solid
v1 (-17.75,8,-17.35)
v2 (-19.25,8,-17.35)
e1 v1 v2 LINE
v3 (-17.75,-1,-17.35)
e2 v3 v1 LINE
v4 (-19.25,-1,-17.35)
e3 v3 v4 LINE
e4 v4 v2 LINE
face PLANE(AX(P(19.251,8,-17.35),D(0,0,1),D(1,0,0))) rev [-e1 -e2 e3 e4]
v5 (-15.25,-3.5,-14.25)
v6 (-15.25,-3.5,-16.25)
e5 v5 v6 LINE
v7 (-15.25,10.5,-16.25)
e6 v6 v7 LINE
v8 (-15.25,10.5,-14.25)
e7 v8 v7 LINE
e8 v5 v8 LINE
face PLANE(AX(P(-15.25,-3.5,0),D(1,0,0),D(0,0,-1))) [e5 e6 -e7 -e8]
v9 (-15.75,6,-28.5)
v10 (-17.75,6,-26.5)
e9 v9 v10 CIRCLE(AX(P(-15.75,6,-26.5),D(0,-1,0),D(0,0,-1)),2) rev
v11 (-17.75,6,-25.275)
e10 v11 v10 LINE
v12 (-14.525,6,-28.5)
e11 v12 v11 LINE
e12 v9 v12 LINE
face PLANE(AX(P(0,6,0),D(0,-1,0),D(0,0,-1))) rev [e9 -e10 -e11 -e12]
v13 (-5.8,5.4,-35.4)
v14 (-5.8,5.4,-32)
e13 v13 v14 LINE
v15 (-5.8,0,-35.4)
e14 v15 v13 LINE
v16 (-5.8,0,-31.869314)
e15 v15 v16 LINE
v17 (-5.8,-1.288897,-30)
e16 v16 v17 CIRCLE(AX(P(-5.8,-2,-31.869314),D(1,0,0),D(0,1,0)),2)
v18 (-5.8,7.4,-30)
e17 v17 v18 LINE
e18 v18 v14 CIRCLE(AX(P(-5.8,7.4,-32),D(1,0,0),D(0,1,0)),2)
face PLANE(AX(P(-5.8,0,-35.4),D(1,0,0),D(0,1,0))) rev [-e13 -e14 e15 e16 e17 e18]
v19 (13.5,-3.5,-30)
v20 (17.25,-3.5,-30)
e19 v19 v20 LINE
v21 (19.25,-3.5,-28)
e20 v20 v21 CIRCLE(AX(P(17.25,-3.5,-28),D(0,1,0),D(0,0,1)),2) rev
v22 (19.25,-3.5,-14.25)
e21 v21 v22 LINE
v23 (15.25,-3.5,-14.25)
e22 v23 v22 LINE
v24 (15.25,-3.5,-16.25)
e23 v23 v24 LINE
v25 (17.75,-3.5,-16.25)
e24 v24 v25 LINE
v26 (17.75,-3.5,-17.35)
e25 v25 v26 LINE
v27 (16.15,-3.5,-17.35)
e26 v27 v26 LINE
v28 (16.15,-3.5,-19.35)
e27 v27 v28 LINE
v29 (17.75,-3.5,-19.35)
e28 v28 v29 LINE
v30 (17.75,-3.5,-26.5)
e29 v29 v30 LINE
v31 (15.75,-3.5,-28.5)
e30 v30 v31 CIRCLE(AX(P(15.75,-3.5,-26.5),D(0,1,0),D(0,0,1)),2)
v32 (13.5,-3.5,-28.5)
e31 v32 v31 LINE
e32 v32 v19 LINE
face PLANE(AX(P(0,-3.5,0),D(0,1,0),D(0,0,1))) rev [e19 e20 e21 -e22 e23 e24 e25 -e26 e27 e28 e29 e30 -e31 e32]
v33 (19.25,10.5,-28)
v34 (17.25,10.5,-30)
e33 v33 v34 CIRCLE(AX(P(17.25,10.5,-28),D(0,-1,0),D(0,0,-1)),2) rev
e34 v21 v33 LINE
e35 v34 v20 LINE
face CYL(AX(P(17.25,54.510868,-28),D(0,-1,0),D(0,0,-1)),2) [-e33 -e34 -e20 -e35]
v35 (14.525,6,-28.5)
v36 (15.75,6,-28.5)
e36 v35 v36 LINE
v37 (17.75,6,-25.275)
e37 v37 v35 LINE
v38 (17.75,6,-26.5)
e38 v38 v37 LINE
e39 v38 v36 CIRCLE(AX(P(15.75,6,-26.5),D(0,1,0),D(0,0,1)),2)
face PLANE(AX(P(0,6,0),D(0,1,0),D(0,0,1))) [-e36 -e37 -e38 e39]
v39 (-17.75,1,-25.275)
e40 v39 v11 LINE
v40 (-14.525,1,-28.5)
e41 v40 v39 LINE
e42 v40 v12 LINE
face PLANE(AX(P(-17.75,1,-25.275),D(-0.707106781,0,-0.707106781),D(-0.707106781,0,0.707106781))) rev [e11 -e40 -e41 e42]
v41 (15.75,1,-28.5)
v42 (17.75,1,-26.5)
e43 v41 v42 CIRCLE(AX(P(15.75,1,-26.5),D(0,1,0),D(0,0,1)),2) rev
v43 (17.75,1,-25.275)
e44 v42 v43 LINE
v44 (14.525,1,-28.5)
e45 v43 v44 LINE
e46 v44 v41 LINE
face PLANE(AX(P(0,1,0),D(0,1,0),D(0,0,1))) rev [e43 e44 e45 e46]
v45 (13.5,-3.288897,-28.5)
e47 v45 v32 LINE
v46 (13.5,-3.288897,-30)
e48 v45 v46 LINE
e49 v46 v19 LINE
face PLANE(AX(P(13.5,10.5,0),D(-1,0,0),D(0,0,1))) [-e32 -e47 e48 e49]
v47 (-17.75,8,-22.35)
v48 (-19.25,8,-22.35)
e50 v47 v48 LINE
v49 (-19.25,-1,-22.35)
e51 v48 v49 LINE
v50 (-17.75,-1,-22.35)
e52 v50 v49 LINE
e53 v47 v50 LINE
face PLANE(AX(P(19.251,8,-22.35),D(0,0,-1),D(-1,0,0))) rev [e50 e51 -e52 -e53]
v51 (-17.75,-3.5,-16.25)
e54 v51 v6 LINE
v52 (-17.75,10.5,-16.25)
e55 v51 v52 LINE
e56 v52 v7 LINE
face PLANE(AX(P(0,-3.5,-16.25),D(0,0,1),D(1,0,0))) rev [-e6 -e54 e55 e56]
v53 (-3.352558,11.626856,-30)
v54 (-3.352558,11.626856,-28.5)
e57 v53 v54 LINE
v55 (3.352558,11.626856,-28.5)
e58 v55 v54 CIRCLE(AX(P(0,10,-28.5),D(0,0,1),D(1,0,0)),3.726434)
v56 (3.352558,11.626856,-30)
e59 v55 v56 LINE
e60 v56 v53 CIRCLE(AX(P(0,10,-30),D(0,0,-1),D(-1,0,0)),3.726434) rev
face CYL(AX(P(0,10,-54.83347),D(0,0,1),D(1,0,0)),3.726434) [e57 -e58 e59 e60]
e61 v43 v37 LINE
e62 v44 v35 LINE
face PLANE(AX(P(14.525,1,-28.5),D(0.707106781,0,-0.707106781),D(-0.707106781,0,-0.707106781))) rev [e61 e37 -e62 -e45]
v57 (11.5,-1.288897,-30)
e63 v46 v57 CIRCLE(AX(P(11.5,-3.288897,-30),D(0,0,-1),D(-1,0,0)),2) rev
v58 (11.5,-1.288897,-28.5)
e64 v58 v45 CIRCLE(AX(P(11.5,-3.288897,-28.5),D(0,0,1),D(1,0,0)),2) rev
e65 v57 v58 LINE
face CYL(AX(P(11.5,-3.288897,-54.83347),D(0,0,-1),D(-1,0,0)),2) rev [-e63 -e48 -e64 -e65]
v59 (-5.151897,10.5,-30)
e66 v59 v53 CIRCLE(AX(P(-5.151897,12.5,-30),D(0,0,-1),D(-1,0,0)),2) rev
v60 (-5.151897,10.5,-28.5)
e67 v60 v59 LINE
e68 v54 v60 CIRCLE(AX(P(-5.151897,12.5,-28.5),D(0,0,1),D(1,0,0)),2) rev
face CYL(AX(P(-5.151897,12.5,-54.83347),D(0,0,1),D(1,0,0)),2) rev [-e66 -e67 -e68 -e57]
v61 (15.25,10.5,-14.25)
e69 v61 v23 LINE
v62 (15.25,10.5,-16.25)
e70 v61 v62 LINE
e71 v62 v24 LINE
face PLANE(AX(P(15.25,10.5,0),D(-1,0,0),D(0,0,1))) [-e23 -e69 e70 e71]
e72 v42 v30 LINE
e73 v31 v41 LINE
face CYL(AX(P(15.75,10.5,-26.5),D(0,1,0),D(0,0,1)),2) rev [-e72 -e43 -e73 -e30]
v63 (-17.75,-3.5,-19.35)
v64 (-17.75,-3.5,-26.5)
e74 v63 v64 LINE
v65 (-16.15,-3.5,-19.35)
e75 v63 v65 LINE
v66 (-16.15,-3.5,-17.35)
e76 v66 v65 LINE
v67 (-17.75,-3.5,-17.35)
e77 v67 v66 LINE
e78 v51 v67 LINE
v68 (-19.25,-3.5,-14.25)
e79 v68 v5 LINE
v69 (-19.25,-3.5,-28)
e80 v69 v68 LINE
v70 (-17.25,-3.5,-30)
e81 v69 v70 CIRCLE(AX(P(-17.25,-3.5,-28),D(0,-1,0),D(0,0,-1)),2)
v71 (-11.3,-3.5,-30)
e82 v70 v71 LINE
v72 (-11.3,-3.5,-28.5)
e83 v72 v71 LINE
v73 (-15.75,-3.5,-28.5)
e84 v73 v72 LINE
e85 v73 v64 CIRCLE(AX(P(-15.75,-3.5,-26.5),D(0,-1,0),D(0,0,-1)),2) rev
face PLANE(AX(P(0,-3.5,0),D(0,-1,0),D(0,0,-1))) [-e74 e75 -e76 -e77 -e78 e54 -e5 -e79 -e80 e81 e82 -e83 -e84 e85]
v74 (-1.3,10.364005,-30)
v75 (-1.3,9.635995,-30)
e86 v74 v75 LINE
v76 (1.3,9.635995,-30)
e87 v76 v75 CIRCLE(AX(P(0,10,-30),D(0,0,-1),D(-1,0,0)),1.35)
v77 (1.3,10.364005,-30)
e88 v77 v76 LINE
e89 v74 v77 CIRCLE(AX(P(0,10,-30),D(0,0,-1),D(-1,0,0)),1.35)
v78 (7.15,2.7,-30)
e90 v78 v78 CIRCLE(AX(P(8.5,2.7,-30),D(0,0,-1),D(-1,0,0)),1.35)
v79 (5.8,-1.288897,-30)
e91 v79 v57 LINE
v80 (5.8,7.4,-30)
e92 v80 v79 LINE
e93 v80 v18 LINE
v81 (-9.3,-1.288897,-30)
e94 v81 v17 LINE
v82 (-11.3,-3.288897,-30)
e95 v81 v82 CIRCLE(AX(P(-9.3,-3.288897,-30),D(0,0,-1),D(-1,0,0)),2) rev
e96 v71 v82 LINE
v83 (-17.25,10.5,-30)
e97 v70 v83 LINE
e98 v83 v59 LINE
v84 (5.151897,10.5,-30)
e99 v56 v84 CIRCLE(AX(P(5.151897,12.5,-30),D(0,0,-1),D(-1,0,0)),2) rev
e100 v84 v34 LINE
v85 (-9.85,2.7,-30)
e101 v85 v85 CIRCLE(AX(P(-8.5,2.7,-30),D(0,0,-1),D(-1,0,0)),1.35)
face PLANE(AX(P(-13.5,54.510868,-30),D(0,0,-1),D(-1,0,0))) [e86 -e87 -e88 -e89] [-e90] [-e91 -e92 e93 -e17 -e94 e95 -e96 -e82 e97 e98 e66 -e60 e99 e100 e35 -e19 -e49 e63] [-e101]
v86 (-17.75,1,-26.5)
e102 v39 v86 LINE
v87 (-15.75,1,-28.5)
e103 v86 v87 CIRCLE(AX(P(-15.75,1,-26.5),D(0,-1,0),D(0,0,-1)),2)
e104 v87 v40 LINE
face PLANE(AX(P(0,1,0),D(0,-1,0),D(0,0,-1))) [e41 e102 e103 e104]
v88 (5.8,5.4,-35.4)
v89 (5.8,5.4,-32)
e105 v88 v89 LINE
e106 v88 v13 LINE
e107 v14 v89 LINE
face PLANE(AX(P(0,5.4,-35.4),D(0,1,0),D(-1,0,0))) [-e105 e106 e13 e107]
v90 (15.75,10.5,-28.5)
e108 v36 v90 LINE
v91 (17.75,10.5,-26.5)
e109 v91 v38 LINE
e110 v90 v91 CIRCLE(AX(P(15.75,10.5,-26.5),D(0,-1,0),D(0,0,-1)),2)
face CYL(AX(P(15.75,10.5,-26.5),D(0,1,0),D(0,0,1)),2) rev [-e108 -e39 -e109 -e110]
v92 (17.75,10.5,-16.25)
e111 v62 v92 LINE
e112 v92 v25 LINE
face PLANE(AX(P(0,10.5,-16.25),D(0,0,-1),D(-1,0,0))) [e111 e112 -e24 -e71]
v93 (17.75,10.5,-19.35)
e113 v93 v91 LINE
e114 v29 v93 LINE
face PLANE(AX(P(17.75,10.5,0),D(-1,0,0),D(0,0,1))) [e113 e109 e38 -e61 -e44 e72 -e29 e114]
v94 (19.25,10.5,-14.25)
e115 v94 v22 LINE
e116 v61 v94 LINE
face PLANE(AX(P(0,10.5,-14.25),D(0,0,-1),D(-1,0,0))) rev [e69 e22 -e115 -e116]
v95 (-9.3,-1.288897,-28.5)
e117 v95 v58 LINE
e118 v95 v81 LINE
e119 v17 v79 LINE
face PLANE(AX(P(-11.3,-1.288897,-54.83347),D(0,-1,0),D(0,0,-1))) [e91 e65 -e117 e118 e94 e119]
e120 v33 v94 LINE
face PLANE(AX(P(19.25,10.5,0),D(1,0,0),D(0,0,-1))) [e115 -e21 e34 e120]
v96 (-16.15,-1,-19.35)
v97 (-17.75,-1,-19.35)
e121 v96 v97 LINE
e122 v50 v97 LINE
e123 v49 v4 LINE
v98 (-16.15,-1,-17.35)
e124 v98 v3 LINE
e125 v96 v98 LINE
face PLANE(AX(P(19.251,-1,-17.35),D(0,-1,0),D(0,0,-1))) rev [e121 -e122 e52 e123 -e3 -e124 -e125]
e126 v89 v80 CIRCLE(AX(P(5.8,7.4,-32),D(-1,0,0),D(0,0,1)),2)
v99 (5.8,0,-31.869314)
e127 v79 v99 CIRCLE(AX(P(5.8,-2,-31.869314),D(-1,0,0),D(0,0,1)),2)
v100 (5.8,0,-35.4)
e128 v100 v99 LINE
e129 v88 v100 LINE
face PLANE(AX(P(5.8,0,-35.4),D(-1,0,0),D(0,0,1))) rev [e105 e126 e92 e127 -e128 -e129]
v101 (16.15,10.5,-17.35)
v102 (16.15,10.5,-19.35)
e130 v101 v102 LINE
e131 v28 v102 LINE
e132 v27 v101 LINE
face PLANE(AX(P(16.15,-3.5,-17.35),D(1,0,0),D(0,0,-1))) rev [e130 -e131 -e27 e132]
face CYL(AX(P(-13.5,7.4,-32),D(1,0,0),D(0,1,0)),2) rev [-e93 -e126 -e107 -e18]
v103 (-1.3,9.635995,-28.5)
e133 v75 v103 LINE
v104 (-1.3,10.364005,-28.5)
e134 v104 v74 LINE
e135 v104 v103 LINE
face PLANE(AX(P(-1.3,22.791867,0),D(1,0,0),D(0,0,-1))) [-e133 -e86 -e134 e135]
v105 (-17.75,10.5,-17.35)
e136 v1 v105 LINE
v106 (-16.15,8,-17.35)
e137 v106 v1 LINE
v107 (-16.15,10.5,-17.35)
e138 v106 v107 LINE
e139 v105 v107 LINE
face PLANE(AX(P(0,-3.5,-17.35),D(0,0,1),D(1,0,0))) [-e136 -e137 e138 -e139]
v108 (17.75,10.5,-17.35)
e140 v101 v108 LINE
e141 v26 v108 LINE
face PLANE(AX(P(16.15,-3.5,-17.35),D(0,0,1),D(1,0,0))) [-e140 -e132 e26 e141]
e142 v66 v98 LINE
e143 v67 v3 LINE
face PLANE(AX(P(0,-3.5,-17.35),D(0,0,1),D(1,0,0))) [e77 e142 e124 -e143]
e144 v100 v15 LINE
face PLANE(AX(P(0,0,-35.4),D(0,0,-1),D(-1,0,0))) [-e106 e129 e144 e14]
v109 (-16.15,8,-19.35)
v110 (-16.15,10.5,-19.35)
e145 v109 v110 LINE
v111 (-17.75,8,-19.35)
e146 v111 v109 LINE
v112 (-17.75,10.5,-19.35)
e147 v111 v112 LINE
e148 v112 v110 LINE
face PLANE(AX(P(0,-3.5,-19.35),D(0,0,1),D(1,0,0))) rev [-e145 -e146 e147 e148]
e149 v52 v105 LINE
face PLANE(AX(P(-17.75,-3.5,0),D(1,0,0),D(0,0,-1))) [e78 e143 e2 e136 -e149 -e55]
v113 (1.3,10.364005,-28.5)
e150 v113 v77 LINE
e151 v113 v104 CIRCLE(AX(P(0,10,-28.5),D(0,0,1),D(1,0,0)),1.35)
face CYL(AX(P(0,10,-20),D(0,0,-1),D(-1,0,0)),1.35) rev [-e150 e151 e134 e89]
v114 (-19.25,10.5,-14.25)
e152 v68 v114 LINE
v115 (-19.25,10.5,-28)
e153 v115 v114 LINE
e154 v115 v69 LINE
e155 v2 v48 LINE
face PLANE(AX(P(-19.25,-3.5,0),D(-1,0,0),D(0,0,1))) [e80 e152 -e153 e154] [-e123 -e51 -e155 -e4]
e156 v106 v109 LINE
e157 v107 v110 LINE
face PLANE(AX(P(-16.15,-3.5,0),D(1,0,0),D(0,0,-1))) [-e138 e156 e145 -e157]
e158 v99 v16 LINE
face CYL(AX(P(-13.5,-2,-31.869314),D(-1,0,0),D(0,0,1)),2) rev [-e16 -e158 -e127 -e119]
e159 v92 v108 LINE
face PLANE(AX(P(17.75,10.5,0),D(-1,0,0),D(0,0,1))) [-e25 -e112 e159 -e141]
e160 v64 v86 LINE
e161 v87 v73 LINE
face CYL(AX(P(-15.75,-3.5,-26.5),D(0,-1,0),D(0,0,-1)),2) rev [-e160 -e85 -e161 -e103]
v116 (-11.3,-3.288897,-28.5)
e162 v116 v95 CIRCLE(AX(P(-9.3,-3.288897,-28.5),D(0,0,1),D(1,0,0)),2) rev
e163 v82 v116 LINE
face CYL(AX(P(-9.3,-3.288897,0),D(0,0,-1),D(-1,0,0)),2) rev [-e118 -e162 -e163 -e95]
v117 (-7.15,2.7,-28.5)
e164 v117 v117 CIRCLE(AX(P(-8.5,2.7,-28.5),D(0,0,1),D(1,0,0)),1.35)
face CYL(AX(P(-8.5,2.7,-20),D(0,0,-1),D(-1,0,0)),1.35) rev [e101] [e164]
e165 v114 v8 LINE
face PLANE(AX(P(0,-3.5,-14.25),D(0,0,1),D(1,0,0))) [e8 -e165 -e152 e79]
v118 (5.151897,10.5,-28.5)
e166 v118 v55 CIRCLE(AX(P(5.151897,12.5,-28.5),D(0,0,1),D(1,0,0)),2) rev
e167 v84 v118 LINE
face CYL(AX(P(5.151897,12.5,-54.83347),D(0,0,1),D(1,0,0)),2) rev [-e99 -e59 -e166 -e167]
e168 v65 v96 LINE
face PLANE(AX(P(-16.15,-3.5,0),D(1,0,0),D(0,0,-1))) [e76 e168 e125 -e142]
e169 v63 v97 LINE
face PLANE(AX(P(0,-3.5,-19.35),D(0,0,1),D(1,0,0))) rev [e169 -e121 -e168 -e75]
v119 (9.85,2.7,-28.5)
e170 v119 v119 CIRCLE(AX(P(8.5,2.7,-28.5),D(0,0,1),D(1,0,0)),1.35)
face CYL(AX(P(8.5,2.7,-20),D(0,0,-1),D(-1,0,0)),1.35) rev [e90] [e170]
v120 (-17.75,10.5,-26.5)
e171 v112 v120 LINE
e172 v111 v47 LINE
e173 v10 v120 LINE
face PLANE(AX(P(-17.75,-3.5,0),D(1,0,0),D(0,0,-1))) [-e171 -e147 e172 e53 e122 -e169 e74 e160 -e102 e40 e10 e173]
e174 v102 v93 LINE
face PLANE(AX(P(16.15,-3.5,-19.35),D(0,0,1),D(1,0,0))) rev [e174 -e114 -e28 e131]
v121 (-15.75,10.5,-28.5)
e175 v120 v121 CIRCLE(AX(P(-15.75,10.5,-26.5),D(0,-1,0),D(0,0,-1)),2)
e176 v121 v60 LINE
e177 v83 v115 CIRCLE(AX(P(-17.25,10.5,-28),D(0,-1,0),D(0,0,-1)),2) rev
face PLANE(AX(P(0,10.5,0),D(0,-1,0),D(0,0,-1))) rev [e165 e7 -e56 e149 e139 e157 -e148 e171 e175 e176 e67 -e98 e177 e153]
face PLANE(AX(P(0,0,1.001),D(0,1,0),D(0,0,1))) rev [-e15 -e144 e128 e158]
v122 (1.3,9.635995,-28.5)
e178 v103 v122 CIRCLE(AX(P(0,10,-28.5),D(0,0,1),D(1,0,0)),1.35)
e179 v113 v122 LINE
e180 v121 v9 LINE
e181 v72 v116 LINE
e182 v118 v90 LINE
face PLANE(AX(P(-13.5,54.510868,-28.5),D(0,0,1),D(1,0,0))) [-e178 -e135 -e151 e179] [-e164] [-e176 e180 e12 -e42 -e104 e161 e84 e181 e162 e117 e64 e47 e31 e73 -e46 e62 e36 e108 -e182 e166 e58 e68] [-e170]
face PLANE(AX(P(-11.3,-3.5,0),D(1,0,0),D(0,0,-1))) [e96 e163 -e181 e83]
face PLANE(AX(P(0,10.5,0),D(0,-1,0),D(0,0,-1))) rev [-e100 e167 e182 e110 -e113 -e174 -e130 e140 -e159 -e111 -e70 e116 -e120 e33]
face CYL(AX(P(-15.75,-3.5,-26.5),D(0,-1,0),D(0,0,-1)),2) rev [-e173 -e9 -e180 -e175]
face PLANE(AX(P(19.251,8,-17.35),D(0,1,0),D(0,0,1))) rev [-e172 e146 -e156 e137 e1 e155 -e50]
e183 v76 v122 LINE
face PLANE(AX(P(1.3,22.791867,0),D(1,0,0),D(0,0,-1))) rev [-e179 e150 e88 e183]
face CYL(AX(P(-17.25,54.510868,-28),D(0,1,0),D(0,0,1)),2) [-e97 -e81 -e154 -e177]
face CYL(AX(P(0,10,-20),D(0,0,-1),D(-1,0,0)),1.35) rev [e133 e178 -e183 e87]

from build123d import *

# Parameters (mm, degrees)
SKETCH_1_W               = 27
SKETCH_1_H               = 17
EXTRUDE_1_DEPTH          = 1
SKETCH_2_R               = 2.55
CUT_EXTRUDE_1_DEPTH      = 16.984367363
EXTRUDE_2_DEPTH          = 17
SKETCH_6_W               = 1.5
SKETCH_6_H               = 2
EXTRUDE_3_DEPTH          = 2
CHAMFER_1_SIZE           = 1
CUT_EXTRUDE_4_REACH      = 39.316
SKETCH_8_R               = 2
FILLET_1_R               = 3
SKETCH_9_W               = 7
SKETCH_9_H               = 13
EXTRUDE_4_DEPTH          = 1.5
SKETCH_7_R               = 1.35
CUT_EXTRUDE_5_DEPTH      = 10
CUT_EXTRUDE_6_REACH      = 41.373
FILLET_2_R               = 2.2
SKETCH_13_W              = 11.6
SKETCH_13_H              = 5.4
EXTRUDE_6_DEPTH          = 5.4
CUT_EXTRUDE_7_DEPTH      = 45.299097095
CUT_EXTRUDE_7_DEPTH_BACK = 45.299097095
SKETCH_14_OUTSIDE_W      = 46.85
SKETCH_14_OUTSIDE_H      = 49.25
SKETCH_14_OUTSIDE_W_2    = 27
SKETCH_14_OUTSIDE_H_2    = 6.9
EXTRUDE_7_DEPTH          = 3.5
EXTRUDE_7_DEPTH_BACK     = 10.5
SKETCH_16_W              = 5.6
SKETCH_16_H              = 1.5
SKETCH_16_W_2            = 4.4
SKETCH_16_W_3            = 12.2
EXTRUDE_8_DEPTH          = 2
EXTRUDE_9_DEPTH          = 2.5
CUT_EXTRUDE_8_REACH      = 55.893
SKETCH_18_W              = 5
SKETCH_18_H              = 9
EXTRUDE_START            = -1.5
SKETCH_19_R              = 3.726433752
SKETCH_19_R_2            = 1.35
SKETCH_19_W              = 24.8
SKETCH_19_H              = 1.288897449
EXTRUDE_10_DEPTH         = 1.5
FILLET_4_R               = 2


# Some blends are built 0.0001 mm under size
with BuildPart() as part:
    # 草图1 → 凸台-拉伸1 (new body)
    with BuildSketch(Plane.XY):
        Rectangle(SKETCH_1_W, SKETCH_1_H)
    extrude(amount=EXTRUDE_1_DEPTH)

    # 草图2 → 切除-拉伸1 (cut, through all)
    with BuildSketch(Plane.XY.offset(1)):
        with Locations((0, 4.125)):
            Circle(SKETCH_2_R)
        with Locations((0, -4.125)):
            Circle(SKETCH_2_R)
        with Locations((8.27, 4.125)):
            Circle(SKETCH_2_R)
        with Locations((8.27, -4.125)):
            Circle(SKETCH_2_R)
        with Locations((-8.27, 4.125)):
            Circle(SKETCH_2_R)
        with Locations((-8.27, -4.125)):
            Circle(SKETCH_2_R)
    extrude(amount=-CUT_EXTRUDE_1_DEPTH, mode=Mode.SUBTRACT)

    # 草图3 → 凸台-拉伸2 (add)
    with BuildSketch(Plane.XZ.offset(8.5)):
        Polygon((13.5, 0), (19, 0), (19, -28.5), (-13.5, -28.5), (-13.5, -30), (20.5, -30), (20.5, 1), (13.5, 1), align=None)
    extrude(amount=-EXTRUDE_2_DEPTH)

    # 草图6 → 凸台-拉伸3 (add, symmetric)
    with BuildSketch(Plane(origin=(0, 0, 0), x_dir=(1, 0, 0), z_dir=(0, 1, 0))):
        Polygon((19, 0), (19, 5), (14, 0), align=None)
        Polygon((19, 28.5), (14, 28.5), (19, 23.5), align=None)
        with Locations((18.25, 20)):
            Rectangle(SKETCH_6_W, SKETCH_6_H)
    extrude(amount=EXTRUDE_3_DEPTH, both=True)

    # 倒角1
    chamfer_1_edges = [part.edges().sort_by_distance(p)[0] for p in [
        (-13.5, 0, 0),
    ]]
    chamfer(chamfer_1_edges, length=CHAMFER_1_SIZE - 0.0001)  # a hair under: the kernel refuses the full size

    # 草图8 → 切除-拉伸4 (cut, up to next)
    with BuildSketch(Plane(origin=(0, 0, 0), x_dir=(-1, 0, 0), z_dir=(0, 0, -1)), mode=Mode.PRIVATE) as cut_extrude_4_sk1:
        Circle(SKETCH_8_R)
    cut_extrude_4_tool1 = extrude(cut_extrude_4_sk1.sketch, amount=-CUT_EXTRUDE_4_REACH, mode=Mode.PRIVATE) & part.part
    add(cut_extrude_4_tool1.solids().sort_by_distance((0, 0, 0))[0], mode=Mode.SUBTRACT)

    # 圆角1
    fillet_1_edges = [part.edges().sort_by_distance(p)[0] for p in [
        (20.5, 0, 1),
        (20.5, 0, -30),
        (19, 5.25, -28.5),
        (19, 5.25, 0),
        (19, -5.25, 0),
        (19, -5.25, -28.5),
    ]]
    fillet(fillet_1_edges, radius=FILLET_1_R)

    # 草图9 → 凸台-拉伸4 (add)
    with BuildSketch(Plane(origin=(0, 0, -30), x_dir=(-1, 0, 0), z_dir=(0, 0, -1))):
        with Locations((0, 6.5)):
            Rectangle(SKETCH_9_W, SKETCH_9_H)
    extrude(amount=-EXTRUDE_4_DEPTH)

    # 草图7 → 切除-拉伸5 (cut)
    with BuildSketch(Plane(origin=(0, 0, -30), x_dir=(-1, 0, 0), z_dir=(0, 0, -1))):
        with Locations((0, 10)):
            Circle(SKETCH_7_R)
        with Locations((-8.5, 2.7)):
            Circle(SKETCH_7_R)
        with Locations((8.5, 2.7)):
            Circle(SKETCH_7_R)
    extrude(amount=-CUT_EXTRUDE_5_DEPTH, mode=Mode.SUBTRACT)

    # 草图11 → 切除-拉伸6 (cut, up to next)
    with BuildSketch(Plane(origin=(0, 0, -30), x_dir=(-1, 0, 0), z_dir=(0, 0, -1)), mode=Mode.PRIVATE) as cut_extrude_6_sk1:
        with BuildLine():
            Line((13.5, -8.5), (13.5, 0))
            Line((13.5, 0), (-9, 0))
            ThreePointArc((-9, 0), (-15.01040764, -2.48959236), (-17.5, -8.5))
            Line((-17.5, -8.5), (13.5, -8.5))
        make_face()
    cut_extrude_6_tool1 = extrude(cut_extrude_6_sk1.sketch, amount=-CUT_EXTRUDE_6_REACH, mode=Mode.PRIVATE) & part.part
    add(cut_extrude_6_tool1.solids().sort_by_distance((1.149624, -4.397011, -30))[0], mode=Mode.SUBTRACT)

    # 圆角2
    fillet_2_edges = [part.edges().sort_by_distance(p)[0] for p in [
        (-3.5, 13, -29.25),
        (-3.5, 8.5, -29.25),
        (3.5, 13, -29.25),
        (3.5, 8.5, -29.25),
        (-13.5, 0, -29.25),
        (-13.5, 8.5, -29.25),
    ]]
    fillet(fillet_2_edges, radius=FILLET_2_R)

    # 草图13 → 凸台-拉伸6 (add)
    with BuildSketch(Plane(origin=(0, 0, -30), x_dir=(-1, 0, 0), z_dir=(0, 0, -1))):
        with Locations((0, 2.7)):
            Rectangle(SKETCH_13_W, SKETCH_13_H)
    extrude(amount=EXTRUDE_6_DEPTH)

    # 草图14 outside → 切除-拉伸7 (cut, two sides: drawn at the far end of the back side and taken through both)
    with BuildSketch(Plane(origin=(0, 8.5, 0), x_dir=(1, 0, 0), z_dir=(0, 1, 0)).offset(-CUT_EXTRUDE_7_DEPTH_BACK)):
        with Locations((3.5, 17.2)):
            Rectangle(SKETCH_14_OUTSIDE_W, SKETCH_14_OUTSIDE_H)
        with Locations((0, 31.95)):
            Rectangle(SKETCH_14_OUTSIDE_W_2, SKETCH_14_OUTSIDE_H_2, mode=Mode.SUBTRACT)
    extrude(amount=CUT_EXTRUDE_7_DEPTH + CUT_EXTRUDE_7_DEPTH_BACK, mode=Mode.SUBTRACT)

    # 草图15 → 凸台-拉伸7 (add, two sides: drawn at the far end of the back side and taken through both)
    with BuildSketch(Plane.XZ.offset(-EXTRUDE_7_DEPTH_BACK)):
        Polygon((-19.25, -14.25), (-19.25, -30), (-11.3, -30), (-11.3, -28.5), (-17.75, -28.5), (-17.75, -19.35), (-16.15, -19.35), (-16.15, -17.35), (-17.75, -17.35), (-17.75, -16.25), (-15.25, -16.25), (-15.25, -14.25), align=None)
        Polygon((17.75, -28.5), (13.5, -28.5), (13.5, -30), (19.25, -30), (19.25, -14.25), (15.25, -14.25), (15.25, -16.25), (17.75, -16.25), (17.75, -17.35), (16.15, -17.35), (16.15, -19.35), (17.75, -19.35), align=None)
    extrude(amount=EXTRUDE_7_DEPTH + EXTRUDE_7_DEPTH_BACK)

    # 草图16 → 凸台-拉伸8 (add)
    with BuildSketch(Plane(origin=(0, 8.5, 0), x_dir=(1, 0, 0), z_dir=(0, 1, 0))):
        with Locations((-8.5, 29.25)):
            Rectangle(SKETCH_16_W, SKETCH_16_H)
        with Locations((-3.5, 29.25)):
            Rectangle(SKETCH_16_W_2, SKETCH_16_H)
        with Locations((7.4, 29.25)):
            Rectangle(SKETCH_16_W_3, SKETCH_16_H)
    extrude(amount=EXTRUDE_8_DEPTH)

    # 草图17 → 凸台-拉伸9 (add, symmetric)
    with BuildSketch(Plane(origin=(0, 3.5, 0), x_dir=(-1, 0, 0), z_dir=(0, -1, 0))):
        Polygon((17.75, 25.275), (14.525, 28.5), (17.75, 28.5), align=None)
        Polygon((-17.75, 25.275), (-17.75, 28.5), (-14.525, 28.5), align=None)
    extrude(amount=EXTRUDE_9_DEPTH, both=True)

    # 草图18 → 切除-拉伸8 (cut, up to next)
    with BuildSketch(Plane.ZY.offset(19.25), mode=Mode.PRIVATE) as cut_extrude_8_sk1:
        with Locations((-19.85, 3.5)):
            Rectangle(SKETCH_18_W, SKETCH_18_H)
    cut_extrude_8_tool1 = extrude(cut_extrude_8_sk1.sketch, amount=-CUT_EXTRUDE_8_REACH, mode=Mode.PRIVATE) & part.part
    add(cut_extrude_8_tool1.solids().sort_by_distance((-19.25, 3.5, -19.85))[0], mode=Mode.SUBTRACT)

    # 草图19 → 凸台-拉伸10 (add)
    # profile 1 of 2: a face of its own
    with BuildSketch(Plane.XY.offset(-28.5).offset(EXTRUDE_START)):
        with Locations((0, 10)):
            Circle(SKETCH_19_R)
        with Locations((0, 10)):
            Circle(SKETCH_19_R_2, mode=Mode.SUBTRACT)
    # profile 2 of 2: a face of its own
    with BuildSketch(Plane.XY.offset(-28.5).offset(EXTRUDE_START)):
        with Locations((1.1, -0.644448725)):
            Rectangle(SKETCH_19_W, SKETCH_19_H)
    extrude(amount=EXTRUDE_10_DEPTH)

    # 圆角4
    # the kernel refuses this fillet: 2 mm, written as the material it adds along each edge
    with BuildSketch(Plane(origin=(-5.8, 5.4, -30), x_dir=(0, 1, 0), z_dir=(1, 0, 0))) as fillet_4_piece_1:
        with BuildLine():
            CenterArc((FILLET_4_R, -FILLET_4_R), FILLET_4_R, 90, 90)
            Line((0, -FILLET_4_R), (0, 0))
            Line((0, 0), (FILLET_4_R, 0))
        make_face()
    extrude(amount=11.6)
    with BuildSketch(Plane(origin=(13.5, -1.288897449, -28.5), x_dir=(0, -1, 0), z_dir=(0, 0, -1))) as fillet_4_piece_2:
        with BuildLine():
            CenterArc((FILLET_4_R, FILLET_4_R), FILLET_4_R, 180, 90)
            Line((0, FILLET_4_R), (0, 0))
            Line((0, 0), (FILLET_4_R, 0))
        make_face()
    extrude(amount=1.5)
    with BuildSketch(Plane(origin=(17.75, 1, -28.5), x_dir=(-1, 0, 0), z_dir=(0, 1, 0)), Plane(origin=(-17.75, 6, -28.5), x_dir=(1, 0, 0), z_dir=(0, -1, 0)), Plane(origin=(-17.75, 10.5, -28.5), x_dir=(1, 0, 0), z_dir=(0, -1, 0)), Plane(origin=(17.75, -3.5, -28.5), x_dir=(-1, 0, 0), z_dir=(0, 1, 0))) as fillet_4_piece_3:
        with BuildLine():
            CenterArc((FILLET_4_R, FILLET_4_R), FILLET_4_R, 180, 90)
            Line((0, FILLET_4_R), (0, 0))
            Line((0, 0), (FILLET_4_R, 0))
        make_face()
    extrude(amount=9.5)
    with BuildSketch(Plane(origin=(-3.692737265, 10.5, -28.5), x_dir=(-1, 0, 0), z_dir=(0, 0, -1))) as fillet_4_piece_4:
        with BuildLine():
            CenterArc((1.459159814, 2), FILLET_4_R, 205.88535786, 64.11464214)
            ThreePointArc((-0.340178937, 1.126856222), (-0.125315404, 0.576944648), (0, 0))
            Line((0, 0), (1.459159814, 0))
        make_face()
    extrude(amount=1.5)
    with BuildSketch(Plane(origin=(3.692737265, 10.5, -28.5), x_dir=(-0.28900142054358374, 0.9573286681823493, 0), z_dir=(0, 0, -1))) as fillet_4_piece_5:
        with BuildLine():
            CenterArc((1.492958077, 1.974898363), FILLET_4_R, 196.798181975, 64.11464214)
            Line((-0.421699259, 1.396895522), (0, 0))
            ThreePointArc((0, 0), (0.588541981, 0.046769794), (1.177083962, 0))
        make_face()
    extrude(amount=1.5)
    with BuildSketch(Plane(origin=(-5.8, 0, -30), x_dir=(0, -1, 0), z_dir=(1, 0, 0))) as fillet_4_piece_6:
        with BuildLine():
            CenterArc((2, 1.869313554), FILLET_4_R, 180, 69.172765444)
            Line((0, 1.869313554), (0, 0))
            Line((0, 0), (1.288897449, 0))
        make_face()
    extrude(amount=11.6)
    with BuildSketch(Plane(origin=(-11.3, -1.288897449, -30), x_dir=(1, 0, 0), z_dir=(0, 0, 1))) as fillet_4_piece_7:
        with BuildLine():
            CenterArc((FILLET_4_R, -FILLET_4_R), FILLET_4_R, 90, 90)
            Line((0, -FILLET_4_R), (0, 0))
            Line((0, 0), (FILLET_4_R, 0))
        make_face()
    extrude(amount=1.5)
    # the kernel refuses this fillet: 2 mm, written as the material it takes off along each edge
    with BuildSketch(Plane(origin=(19.25, 15.5, -30), x_dir=(-1, 0, 0), z_dir=(0, -1, 0))) as fillet_4_2_piece_1:
        with BuildLine():
            CenterArc((FILLET_4_R, -FILLET_4_R), FILLET_4_R, 90, 90)
            Line((0, -FILLET_4_R), (0, 0))
            Line((0, 0), (FILLET_4_R, 0))
        make_face()
    extrude(amount=24, mode=Mode.SUBTRACT)
    with BuildSketch(Plane(origin=(-19.25, 15.5, -30), x_dir=(1, 0, 0), z_dir=(0, -1, 0))) as fillet_4_2_piece_2:
        with BuildLine():
            CenterArc((FILLET_4_R, FILLET_4_R), FILLET_4_R, 180, 90)
            Line((0, FILLET_4_R), (0, 0))
            Line((0, 0), (FILLET_4_R, 0))
        make_face()
    extrude(amount=24, mode=Mode.SUBTRACT)


solid = part.part
